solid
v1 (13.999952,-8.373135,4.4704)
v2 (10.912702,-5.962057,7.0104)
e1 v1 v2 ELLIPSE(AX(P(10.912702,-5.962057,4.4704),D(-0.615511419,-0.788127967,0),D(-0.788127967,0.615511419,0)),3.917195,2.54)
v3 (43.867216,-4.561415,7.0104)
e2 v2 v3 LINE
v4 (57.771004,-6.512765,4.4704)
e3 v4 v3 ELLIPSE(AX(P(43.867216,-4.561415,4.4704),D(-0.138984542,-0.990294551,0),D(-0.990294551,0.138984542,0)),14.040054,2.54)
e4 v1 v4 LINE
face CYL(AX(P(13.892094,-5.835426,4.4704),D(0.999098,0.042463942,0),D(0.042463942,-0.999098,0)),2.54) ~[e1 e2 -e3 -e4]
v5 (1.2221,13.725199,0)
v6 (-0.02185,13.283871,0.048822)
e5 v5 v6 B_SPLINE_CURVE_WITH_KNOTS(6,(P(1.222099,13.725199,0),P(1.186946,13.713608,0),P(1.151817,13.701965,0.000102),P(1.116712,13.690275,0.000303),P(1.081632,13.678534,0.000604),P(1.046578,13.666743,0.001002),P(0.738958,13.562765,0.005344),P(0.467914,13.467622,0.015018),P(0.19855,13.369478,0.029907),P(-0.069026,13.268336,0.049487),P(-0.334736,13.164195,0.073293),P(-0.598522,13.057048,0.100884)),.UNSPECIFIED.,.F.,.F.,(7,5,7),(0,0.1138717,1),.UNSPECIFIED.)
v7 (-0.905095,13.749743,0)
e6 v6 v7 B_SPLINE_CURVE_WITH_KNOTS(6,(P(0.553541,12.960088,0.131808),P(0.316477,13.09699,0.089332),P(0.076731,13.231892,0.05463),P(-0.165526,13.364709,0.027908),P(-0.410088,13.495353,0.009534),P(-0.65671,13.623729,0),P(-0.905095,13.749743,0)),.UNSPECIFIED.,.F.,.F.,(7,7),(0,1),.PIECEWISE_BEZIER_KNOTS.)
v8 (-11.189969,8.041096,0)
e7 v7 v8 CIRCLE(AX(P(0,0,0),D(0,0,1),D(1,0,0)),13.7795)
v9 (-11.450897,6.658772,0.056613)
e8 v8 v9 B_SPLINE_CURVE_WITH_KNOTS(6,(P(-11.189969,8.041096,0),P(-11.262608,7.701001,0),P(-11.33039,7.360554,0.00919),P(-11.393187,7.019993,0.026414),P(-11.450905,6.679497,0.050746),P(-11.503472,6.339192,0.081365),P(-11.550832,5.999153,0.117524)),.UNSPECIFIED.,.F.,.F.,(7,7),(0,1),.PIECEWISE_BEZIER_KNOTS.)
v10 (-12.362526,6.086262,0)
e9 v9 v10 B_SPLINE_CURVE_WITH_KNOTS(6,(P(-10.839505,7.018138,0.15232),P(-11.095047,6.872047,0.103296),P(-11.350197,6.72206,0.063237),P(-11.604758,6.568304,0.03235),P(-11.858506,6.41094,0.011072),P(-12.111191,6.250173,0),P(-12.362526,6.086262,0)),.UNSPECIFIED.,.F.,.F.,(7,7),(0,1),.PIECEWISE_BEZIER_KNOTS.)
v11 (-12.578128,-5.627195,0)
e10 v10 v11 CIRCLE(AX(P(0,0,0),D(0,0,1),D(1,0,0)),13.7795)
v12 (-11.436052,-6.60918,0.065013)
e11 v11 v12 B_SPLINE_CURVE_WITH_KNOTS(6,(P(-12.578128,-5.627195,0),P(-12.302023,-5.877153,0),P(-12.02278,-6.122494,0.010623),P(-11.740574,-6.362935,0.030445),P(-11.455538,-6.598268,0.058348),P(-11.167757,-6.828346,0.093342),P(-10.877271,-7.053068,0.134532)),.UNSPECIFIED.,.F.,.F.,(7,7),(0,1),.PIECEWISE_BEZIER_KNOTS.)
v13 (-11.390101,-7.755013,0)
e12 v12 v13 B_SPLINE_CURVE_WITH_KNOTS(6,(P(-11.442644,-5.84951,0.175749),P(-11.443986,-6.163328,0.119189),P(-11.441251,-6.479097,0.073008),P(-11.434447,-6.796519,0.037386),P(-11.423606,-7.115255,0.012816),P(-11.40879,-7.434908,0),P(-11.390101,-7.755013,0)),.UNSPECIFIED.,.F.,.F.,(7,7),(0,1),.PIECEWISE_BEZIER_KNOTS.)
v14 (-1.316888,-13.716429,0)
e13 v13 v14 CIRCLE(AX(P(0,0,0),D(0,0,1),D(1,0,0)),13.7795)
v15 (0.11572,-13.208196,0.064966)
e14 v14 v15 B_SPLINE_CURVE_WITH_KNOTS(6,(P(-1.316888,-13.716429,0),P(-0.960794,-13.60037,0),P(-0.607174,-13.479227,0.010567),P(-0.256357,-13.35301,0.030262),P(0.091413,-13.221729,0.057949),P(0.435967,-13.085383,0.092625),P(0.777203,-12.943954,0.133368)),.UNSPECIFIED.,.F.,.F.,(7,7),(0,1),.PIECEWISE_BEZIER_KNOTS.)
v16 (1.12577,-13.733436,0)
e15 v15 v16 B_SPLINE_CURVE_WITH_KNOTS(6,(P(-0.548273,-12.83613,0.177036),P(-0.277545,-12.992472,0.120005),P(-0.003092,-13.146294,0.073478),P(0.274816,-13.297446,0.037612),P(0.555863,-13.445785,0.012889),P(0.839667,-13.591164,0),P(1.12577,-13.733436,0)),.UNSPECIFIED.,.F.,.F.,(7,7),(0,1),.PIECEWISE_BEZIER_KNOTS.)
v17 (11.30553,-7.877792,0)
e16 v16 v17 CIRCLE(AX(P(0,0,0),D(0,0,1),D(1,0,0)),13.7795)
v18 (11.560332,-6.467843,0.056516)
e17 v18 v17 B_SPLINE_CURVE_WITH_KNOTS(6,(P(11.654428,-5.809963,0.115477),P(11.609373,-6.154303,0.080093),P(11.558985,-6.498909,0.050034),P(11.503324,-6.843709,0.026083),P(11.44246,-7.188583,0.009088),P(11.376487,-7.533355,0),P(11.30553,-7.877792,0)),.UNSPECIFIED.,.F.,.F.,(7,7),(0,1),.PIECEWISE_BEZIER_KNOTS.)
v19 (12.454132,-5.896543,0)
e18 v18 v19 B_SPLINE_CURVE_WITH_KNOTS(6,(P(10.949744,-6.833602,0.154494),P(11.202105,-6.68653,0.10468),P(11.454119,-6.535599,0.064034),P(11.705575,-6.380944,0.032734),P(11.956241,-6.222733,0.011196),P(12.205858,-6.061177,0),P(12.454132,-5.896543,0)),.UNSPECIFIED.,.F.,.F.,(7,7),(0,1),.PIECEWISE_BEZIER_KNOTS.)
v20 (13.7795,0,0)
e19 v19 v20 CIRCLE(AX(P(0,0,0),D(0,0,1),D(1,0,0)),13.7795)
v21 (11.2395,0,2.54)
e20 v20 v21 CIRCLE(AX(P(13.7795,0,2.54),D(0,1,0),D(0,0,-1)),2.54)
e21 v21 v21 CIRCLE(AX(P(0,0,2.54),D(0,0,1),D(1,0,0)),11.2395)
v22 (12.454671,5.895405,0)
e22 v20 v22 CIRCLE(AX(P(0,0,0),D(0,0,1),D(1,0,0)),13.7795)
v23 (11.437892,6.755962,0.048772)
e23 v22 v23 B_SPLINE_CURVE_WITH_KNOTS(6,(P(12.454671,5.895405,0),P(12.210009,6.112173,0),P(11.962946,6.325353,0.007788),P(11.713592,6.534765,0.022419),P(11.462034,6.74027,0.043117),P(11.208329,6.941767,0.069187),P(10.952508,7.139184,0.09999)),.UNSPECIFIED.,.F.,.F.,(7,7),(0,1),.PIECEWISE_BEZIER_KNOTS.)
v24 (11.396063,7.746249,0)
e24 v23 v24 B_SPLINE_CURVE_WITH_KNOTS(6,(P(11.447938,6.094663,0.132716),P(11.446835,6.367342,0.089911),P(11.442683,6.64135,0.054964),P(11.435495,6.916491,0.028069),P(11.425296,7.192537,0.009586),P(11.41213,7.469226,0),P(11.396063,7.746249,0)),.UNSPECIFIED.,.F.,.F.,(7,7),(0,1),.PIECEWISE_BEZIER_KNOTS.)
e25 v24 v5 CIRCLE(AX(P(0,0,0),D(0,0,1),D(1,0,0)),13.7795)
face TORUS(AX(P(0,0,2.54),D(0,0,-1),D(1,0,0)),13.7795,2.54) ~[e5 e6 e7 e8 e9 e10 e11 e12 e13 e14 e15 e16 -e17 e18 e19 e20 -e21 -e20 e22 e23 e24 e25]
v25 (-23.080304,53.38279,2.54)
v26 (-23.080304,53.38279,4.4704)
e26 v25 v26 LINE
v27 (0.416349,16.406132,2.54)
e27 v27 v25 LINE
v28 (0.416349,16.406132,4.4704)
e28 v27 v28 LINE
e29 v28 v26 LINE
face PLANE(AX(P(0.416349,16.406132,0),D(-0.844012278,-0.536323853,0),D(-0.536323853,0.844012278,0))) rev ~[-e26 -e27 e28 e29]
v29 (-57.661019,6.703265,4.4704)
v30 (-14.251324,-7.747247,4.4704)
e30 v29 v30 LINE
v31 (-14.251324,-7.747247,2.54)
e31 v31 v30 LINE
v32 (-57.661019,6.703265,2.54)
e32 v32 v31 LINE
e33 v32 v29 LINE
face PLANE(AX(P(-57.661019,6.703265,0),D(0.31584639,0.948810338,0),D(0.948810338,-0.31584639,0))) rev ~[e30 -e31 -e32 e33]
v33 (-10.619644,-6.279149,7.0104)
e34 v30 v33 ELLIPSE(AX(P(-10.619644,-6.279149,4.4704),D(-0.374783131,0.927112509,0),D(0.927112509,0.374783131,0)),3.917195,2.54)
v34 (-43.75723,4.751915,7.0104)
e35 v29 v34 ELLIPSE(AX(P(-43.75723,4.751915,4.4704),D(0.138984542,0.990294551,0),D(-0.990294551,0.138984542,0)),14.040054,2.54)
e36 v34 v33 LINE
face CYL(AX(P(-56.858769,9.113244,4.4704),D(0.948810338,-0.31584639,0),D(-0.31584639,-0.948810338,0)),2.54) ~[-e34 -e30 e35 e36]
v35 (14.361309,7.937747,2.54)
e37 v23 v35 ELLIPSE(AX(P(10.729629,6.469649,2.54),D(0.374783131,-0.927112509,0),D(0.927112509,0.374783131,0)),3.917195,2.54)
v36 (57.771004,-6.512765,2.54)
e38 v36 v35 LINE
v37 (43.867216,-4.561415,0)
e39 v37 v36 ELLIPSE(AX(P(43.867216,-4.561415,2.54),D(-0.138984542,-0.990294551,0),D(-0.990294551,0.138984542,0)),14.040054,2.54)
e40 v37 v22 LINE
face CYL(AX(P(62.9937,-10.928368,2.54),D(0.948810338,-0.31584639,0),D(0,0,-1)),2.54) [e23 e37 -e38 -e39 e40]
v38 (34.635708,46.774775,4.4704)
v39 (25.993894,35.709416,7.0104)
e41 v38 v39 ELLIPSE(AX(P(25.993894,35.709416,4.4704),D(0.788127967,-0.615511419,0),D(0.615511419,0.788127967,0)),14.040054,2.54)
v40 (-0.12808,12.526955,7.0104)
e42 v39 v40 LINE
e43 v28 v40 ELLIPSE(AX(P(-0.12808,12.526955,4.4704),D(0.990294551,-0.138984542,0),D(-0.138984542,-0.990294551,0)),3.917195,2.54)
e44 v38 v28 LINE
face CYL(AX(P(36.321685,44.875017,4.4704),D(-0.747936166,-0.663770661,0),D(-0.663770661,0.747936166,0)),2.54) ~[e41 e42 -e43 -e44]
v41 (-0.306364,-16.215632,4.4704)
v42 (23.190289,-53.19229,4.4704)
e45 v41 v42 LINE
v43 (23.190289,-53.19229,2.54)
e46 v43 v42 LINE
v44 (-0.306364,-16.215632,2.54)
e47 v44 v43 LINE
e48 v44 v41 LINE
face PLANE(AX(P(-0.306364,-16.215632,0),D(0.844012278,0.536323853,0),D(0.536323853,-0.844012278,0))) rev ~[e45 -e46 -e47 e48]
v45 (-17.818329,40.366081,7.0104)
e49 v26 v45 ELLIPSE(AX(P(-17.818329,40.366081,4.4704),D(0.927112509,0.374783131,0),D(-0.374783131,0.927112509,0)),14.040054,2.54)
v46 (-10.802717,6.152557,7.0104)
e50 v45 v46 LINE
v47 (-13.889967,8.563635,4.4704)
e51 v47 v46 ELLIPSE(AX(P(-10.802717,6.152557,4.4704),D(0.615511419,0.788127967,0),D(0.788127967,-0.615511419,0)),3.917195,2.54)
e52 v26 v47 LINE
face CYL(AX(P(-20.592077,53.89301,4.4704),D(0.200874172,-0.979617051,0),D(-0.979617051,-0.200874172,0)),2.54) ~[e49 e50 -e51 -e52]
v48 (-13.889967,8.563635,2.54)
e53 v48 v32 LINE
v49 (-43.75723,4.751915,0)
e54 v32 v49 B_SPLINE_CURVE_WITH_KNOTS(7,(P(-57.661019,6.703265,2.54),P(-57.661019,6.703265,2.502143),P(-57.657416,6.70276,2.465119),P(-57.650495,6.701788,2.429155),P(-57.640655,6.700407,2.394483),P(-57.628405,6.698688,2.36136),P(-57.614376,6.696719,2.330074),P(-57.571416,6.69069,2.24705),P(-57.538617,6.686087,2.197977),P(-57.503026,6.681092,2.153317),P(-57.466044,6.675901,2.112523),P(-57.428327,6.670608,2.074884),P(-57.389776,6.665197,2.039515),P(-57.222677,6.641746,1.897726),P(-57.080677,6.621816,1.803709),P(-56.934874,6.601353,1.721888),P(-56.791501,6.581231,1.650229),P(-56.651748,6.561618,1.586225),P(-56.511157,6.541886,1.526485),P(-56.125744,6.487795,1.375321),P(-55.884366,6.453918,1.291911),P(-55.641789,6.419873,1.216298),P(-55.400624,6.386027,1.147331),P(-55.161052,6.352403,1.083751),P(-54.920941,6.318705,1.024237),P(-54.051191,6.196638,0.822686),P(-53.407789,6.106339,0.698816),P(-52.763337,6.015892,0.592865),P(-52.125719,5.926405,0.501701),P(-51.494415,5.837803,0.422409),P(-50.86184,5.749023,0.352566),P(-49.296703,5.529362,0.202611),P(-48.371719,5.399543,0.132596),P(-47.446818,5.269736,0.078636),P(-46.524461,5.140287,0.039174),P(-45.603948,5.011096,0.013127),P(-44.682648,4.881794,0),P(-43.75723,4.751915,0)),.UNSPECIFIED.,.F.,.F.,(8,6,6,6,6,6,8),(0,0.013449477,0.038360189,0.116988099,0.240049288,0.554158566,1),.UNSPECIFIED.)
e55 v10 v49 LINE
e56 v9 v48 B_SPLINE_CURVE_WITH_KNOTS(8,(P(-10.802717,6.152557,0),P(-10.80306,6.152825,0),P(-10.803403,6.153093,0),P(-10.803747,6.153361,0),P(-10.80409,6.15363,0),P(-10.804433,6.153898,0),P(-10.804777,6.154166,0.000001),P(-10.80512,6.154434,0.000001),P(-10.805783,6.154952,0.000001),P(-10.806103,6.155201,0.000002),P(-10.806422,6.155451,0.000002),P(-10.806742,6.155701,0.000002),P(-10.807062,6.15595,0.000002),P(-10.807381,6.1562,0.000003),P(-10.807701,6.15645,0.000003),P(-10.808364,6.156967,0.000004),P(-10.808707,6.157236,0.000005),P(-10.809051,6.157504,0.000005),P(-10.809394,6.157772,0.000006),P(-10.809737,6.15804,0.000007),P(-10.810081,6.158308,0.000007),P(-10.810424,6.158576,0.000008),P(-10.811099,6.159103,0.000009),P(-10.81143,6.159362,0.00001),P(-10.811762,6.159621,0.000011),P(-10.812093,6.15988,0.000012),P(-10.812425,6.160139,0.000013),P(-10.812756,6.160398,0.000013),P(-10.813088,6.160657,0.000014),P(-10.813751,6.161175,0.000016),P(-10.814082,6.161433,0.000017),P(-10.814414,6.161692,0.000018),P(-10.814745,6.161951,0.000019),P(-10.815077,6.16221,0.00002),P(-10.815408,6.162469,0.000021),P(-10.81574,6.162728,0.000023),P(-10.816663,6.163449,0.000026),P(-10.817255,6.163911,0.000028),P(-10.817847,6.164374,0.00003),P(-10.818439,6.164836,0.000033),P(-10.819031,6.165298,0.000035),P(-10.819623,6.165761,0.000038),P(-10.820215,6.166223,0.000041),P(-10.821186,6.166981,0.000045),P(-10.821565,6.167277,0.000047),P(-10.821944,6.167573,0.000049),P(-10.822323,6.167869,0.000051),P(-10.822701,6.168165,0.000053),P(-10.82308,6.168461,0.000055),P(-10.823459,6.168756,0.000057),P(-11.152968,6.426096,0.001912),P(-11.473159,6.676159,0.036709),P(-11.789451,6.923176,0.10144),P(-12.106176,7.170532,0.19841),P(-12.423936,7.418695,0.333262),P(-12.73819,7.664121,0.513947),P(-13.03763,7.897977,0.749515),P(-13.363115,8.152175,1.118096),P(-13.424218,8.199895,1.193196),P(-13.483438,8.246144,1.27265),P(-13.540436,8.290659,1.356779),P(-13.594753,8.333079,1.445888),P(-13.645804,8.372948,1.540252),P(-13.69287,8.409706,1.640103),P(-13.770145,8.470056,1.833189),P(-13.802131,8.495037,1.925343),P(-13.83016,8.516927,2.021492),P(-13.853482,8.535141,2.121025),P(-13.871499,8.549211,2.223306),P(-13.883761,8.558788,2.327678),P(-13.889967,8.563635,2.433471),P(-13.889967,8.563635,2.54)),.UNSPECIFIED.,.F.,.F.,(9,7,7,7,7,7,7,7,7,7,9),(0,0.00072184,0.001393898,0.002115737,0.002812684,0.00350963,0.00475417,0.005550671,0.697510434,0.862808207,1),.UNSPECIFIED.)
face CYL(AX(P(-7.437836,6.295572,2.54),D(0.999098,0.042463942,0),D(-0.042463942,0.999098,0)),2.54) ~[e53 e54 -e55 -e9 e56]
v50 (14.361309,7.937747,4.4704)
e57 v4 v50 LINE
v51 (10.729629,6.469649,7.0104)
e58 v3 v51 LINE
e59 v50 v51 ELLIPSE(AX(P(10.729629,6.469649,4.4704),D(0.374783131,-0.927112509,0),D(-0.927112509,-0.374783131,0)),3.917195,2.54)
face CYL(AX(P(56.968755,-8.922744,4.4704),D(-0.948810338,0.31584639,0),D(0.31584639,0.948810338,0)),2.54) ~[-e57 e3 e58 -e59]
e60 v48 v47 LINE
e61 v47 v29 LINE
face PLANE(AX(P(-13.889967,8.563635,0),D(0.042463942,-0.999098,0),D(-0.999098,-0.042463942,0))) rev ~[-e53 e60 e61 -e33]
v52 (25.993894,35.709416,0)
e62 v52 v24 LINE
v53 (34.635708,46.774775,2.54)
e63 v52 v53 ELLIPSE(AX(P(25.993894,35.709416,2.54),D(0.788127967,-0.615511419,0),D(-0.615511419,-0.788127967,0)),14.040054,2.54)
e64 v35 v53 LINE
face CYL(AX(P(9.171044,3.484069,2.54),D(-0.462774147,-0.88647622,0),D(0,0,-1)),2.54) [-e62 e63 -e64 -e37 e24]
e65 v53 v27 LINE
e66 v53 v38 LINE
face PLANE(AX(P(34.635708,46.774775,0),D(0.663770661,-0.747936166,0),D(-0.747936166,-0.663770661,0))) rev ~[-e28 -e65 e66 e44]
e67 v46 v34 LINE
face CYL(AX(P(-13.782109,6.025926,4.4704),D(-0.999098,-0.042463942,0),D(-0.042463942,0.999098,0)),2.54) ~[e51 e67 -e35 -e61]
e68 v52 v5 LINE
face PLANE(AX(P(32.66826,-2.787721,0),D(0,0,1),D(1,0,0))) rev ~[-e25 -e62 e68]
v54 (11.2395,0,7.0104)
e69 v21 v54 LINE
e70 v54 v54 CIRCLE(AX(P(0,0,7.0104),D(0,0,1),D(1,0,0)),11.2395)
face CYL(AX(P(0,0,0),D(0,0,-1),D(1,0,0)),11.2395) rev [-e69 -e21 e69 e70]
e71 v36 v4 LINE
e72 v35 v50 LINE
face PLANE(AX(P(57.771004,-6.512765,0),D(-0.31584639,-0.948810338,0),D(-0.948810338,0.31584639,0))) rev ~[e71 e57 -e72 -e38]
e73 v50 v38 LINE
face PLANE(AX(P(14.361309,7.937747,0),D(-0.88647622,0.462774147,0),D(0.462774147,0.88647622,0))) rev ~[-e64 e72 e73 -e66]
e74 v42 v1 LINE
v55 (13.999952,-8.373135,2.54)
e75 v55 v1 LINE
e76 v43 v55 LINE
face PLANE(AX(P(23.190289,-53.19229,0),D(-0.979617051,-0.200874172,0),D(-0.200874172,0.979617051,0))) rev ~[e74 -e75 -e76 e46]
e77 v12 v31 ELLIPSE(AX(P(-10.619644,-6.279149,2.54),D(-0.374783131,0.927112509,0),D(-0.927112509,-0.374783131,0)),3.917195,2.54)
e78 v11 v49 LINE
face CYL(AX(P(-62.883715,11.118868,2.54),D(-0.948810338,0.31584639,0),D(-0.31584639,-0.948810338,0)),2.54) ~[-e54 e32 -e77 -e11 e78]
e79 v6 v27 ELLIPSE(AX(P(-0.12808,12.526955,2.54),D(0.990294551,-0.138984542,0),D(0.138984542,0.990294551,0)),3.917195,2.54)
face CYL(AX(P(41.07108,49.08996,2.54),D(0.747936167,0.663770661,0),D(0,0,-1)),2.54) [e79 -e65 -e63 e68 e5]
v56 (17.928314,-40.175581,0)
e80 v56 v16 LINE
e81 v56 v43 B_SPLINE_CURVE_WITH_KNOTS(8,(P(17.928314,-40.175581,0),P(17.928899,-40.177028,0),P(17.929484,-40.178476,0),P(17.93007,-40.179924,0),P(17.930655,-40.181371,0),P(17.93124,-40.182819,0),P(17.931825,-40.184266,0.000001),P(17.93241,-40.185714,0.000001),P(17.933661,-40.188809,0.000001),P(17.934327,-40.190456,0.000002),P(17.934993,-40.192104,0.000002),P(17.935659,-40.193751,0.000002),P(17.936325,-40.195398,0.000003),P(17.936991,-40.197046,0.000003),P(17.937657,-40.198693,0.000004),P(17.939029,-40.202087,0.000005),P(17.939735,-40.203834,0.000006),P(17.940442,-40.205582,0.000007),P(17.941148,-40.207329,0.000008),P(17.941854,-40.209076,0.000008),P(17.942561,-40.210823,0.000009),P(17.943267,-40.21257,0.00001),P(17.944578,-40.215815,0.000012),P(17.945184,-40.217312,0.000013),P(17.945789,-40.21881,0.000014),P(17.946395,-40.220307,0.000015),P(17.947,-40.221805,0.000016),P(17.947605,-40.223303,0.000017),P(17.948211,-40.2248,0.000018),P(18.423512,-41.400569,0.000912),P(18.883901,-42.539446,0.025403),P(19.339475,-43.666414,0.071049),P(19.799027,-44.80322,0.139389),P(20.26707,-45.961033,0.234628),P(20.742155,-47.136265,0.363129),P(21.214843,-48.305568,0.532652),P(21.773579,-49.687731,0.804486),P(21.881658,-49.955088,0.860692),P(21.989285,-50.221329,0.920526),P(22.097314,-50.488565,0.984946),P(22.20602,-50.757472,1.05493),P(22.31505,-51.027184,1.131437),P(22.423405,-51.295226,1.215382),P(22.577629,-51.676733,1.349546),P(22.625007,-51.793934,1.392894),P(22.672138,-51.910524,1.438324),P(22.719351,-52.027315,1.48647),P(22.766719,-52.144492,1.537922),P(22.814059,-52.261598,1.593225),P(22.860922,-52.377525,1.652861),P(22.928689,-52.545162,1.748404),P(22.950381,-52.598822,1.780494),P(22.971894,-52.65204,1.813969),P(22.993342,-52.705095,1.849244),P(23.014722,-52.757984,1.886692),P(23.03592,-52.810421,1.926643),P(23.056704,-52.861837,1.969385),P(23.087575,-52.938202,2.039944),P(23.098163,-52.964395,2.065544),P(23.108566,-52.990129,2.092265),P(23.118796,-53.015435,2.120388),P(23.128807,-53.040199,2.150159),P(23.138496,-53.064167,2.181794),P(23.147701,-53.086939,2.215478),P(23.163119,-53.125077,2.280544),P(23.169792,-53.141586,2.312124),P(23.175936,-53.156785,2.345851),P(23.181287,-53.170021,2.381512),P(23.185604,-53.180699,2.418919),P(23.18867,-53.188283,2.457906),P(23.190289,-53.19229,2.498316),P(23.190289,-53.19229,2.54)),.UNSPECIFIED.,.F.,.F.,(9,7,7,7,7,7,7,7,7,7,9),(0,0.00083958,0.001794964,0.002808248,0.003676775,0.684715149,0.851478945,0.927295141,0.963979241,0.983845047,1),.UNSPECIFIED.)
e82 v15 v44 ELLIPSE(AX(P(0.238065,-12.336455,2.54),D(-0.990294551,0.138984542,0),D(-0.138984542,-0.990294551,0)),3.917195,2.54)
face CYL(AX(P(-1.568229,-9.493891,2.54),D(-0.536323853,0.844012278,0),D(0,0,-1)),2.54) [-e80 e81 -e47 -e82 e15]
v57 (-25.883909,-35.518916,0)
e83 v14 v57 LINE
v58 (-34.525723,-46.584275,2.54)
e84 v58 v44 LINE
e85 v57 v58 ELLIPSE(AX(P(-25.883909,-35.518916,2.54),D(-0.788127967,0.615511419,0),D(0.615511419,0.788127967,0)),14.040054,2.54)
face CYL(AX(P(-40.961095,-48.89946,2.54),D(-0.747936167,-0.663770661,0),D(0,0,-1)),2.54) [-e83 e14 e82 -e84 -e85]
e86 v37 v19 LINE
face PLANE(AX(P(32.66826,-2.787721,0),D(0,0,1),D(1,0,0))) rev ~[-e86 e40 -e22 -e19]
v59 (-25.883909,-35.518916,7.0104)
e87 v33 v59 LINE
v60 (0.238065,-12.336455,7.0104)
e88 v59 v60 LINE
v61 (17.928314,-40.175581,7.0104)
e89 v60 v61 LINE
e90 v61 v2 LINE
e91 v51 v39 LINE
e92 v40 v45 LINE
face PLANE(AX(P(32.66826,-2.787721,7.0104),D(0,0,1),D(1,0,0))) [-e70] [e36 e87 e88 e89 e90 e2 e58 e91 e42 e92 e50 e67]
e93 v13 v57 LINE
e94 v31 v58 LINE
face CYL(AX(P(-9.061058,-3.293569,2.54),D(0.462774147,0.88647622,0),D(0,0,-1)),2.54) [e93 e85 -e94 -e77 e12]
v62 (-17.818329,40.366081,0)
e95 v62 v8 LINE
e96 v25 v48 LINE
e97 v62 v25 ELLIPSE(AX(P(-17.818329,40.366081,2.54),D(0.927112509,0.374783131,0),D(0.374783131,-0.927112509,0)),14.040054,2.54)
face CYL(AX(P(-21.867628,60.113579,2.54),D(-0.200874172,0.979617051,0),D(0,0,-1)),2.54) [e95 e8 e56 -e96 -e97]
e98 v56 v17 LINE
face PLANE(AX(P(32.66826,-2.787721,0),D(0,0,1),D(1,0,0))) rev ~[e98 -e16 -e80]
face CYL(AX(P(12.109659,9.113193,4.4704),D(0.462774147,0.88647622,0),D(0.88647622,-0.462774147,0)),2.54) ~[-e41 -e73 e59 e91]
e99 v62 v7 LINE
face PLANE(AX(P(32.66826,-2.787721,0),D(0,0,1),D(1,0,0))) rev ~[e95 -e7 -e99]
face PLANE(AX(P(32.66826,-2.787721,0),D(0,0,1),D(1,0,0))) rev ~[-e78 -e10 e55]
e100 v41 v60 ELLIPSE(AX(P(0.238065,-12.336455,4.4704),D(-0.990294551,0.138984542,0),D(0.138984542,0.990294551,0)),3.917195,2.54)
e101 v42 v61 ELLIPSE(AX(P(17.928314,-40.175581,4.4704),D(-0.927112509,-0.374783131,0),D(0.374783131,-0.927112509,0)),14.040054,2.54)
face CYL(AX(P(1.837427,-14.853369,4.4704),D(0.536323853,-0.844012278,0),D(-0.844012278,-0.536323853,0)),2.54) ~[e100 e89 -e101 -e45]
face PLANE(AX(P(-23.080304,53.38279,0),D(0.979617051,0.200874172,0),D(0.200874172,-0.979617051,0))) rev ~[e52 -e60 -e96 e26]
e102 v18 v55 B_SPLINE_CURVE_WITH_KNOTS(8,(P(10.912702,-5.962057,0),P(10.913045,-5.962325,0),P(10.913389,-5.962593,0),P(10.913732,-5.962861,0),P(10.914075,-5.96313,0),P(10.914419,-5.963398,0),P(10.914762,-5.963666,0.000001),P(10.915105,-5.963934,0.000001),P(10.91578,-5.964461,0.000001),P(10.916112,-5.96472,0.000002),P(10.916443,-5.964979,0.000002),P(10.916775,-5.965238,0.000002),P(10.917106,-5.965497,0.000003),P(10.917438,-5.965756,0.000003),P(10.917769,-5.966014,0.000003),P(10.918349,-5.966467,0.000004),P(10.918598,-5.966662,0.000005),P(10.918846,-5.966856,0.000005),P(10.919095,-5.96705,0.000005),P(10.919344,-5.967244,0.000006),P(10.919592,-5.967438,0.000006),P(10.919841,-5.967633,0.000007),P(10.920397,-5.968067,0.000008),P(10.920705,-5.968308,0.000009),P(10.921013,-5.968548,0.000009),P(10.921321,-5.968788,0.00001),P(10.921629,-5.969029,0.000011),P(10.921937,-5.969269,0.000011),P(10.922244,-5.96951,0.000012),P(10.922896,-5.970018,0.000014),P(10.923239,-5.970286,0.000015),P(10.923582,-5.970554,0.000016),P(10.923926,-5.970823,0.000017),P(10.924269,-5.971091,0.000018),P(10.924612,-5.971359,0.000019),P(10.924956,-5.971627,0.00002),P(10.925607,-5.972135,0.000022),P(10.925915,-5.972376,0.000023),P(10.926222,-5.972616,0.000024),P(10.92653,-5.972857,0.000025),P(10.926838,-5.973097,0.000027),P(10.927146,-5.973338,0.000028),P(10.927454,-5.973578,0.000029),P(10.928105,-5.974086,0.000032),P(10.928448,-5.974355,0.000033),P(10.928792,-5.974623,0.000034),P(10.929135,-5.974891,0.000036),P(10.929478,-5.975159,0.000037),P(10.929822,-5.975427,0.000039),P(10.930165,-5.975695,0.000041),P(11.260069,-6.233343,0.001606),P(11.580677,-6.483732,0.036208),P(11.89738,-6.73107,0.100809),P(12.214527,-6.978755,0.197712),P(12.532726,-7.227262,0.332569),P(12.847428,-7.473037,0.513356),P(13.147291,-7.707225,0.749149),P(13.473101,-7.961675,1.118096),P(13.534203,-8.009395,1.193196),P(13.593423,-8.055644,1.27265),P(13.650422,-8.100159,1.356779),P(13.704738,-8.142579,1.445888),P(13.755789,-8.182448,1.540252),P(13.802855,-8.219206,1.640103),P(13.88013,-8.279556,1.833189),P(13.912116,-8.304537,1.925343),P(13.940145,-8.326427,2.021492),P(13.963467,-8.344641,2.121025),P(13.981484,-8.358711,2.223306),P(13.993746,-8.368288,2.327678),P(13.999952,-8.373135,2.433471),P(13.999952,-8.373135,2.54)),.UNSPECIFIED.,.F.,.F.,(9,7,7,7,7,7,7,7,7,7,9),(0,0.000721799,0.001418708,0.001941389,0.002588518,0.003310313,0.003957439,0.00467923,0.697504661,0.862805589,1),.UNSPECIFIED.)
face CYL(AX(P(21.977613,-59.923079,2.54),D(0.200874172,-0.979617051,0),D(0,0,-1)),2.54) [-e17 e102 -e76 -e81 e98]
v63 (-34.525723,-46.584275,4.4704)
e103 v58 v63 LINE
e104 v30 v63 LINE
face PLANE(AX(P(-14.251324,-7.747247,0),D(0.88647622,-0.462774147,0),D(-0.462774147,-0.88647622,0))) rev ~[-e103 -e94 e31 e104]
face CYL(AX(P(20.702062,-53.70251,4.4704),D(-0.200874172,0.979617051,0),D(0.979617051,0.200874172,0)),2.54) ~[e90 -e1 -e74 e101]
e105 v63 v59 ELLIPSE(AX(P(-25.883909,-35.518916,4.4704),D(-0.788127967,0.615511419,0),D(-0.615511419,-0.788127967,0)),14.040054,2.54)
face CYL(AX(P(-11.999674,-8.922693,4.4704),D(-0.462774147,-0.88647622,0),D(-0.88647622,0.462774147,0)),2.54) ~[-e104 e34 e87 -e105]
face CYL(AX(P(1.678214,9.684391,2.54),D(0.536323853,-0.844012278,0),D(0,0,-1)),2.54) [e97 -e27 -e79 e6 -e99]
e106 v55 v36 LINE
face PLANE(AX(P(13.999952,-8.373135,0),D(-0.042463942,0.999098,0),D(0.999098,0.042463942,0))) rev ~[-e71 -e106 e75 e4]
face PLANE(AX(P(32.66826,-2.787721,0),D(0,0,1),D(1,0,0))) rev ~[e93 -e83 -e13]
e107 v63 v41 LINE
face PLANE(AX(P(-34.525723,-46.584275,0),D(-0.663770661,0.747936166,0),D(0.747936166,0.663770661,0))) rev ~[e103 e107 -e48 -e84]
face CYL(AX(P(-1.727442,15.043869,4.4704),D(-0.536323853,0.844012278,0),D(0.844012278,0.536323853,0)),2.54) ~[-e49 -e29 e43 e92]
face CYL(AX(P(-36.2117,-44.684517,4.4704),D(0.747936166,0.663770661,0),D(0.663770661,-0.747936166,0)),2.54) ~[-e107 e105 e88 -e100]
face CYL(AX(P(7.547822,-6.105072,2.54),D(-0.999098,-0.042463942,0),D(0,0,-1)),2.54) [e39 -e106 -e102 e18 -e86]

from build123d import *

# Parameters (mm, degrees)
F0_R          = 11.2395
F1_DEPTH      = 7.0104
F2_R          = 2.54
F3_T4_DEPTH   = 58.4517099093
F3_T9_DEPTH   = 56.5105690907
F3_T14_DEPTH  = 58.4517099093
F3_T19_DEPTH  = 56.5105690907
F3_T24_DEPTH  = 58.4517099093
F3_T29_DEPTH  = 56.5105690907
F3_T34_DEPTH  = 58.4517099093
F3_T39_DEPTH  = 56.5105690907
F3_T44_DEPTH  = 58.4517099093
F3_T49_DEPTH  = 56.5105690907
F3_T54_DEPTH  = 58.4517099093
F3_T59_DEPTH  = 56.5105690907
F3_T67_DEPTH  = 58.4517099093
F3_T71_DEPTH  = 56.5105690907
F3_T78_DEPTH  = 58.4517099093
F3_T82_DEPTH  = 56.5105690907
F3_T89_DEPTH  = 58.4517099093
F3_T93_DEPTH  = 56.5105690907
F3_T100_DEPTH = 58.4517099093
F3_T104_DEPTH = 56.5105690907
F3_T111_DEPTH = 58.4517099093
F3_T115_DEPTH = 56.5105690907
F3_T122_DEPTH = 56.5105690907
F3_T126_DEPTH = 58.4517099093


# Not quite as in the source:
# - a fillet or chamfer that OpenCascade refuses, or shapes differently, is made with other operations: its cross-section is extruded or revolved along the edge and cut away or added


with BuildPart() as f1:
    # F0 (on Top) → F1 (new body)
    with BuildSketch(Plane.XY):
        with BuildLine():
            ThreePointArc((14.1535943712, 7.539855096), (15.5587542777, 3.8857192152), (16.036634575, 0))
            ThreePointArc((16.036634575, 0), (15.49765005, -4.122680126), (13.91692656, -7.9682371712))
            Line((13.91692656, -7.9682371712), (13.9999523741, -8.373134936))
            Line((13.9999523741, -8.373134936), (57.7710043319, -6.5127654675))
            Line((57.7710043319, -6.5127654675), (14.3613089772, 7.9377469398))
            Line((14.3613089772, 7.9377469398), (14.1535943712, 7.539855096))
        make_face()
        with BuildLine():
            ThreePointArc((0, 16.036634575), (8.2540822497, 13.7493190635), (14.1535943712, 7.539855096))
            Line((14.1535943712, 7.539855096), (14.3613089772, 7.9377469398))
            Line((14.3613089772, 7.9377469398), (34.635707736, 46.7747746198))
            Line((34.635707736, 46.7747746198), (0.4163492162, 16.4061318757))
            Line((0.4163492162, 16.4061318757), (0, 16.036634575))
        make_face()
        with BuildLine():
            Line((13.9999523741, -8.373134936), (13.91692656, -7.9682371712))
            ThreePointArc((13.91692656, -7.9682371712), (13.7943089537, -8.1786728131), (13.6685096291, -8.387222008))
            Line((13.6685096291, -8.387222008), (13.9999523741, -8.373134936))
        make_face()
        with BuildLine():
            ThreePointArc((-13.549530457, 8.5781042712), (-7.7333603611, 14.048800163), (0, 16.036634575))
            Line((0, 16.036634575), (0.4163492162, 16.4061318757))
            Line((0.4163492162, 16.4061318757), (-23.0803039828, 53.3827900874))
            Line((-23.0803039828, 53.3827900874), (-13.8899671478, 8.563634936))
            Line((-13.8899671478, 8.563634936), (-13.549530457, 8.5781042712))
        make_face()
        with BuildLine():
            Line((13.9999523741, -8.373134936), (13.6685096291, -8.387222008))
            ThreePointArc((13.6685096291, -8.387222008), (7.7861485351, -14.0196126723), (-0.1042878985, -16.036295474))
            Line((-0.1042878985, -16.036295474), (-0.30636399, -16.2156318757))
            Line((-0.30636399, -16.2156318757), (23.190289209, -53.1922900874))
            Line((23.190289209, -53.1922900874), (13.9999523741, -8.373134936))
        make_face()
        with BuildLine():
            ThreePointArc((-13.8067270062, 8.157691945), (-13.6797438656, 8.3688862021), (-13.549530457, 8.5781042712))
            Line((-13.549530457, 8.5781042712), (-13.8899671478, 8.563634936))
            Line((-13.8899671478, 8.563634936), (-13.8067270062, 8.157691945))
        make_face()
        with BuildLine():
            Line((-0.30636399, -16.2156318757), (-0.1042878985, -16.036295474))
            ThreePointArc((-0.1042878985, -16.036295474), (-0.2639889319, -16.0344615855), (-0.4236637816, -16.0310373181))
            Line((-0.4236637816, -16.0310373181), (-0.30636399, -16.2156318757))
        make_face()
        with BuildLine():
            ThreePointArc((-14.1482702845, -7.5498408229), (-16.0328448753, 0.3486168375), (-13.8067270062, 8.157691945))
            Line((-13.8067270062, 8.157691945), (-13.8899671478, 8.563634936))
            Line((-13.8899671478, 8.563634936), (-57.6610191056, 6.7032654675))
            Line((-57.6610191056, 6.7032654675), (-14.2513237509, -7.7472469398))
            Line((-14.2513237509, -7.7472469398), (-14.1482702845, -7.5498408229))
        make_face()
        with BuildLine():
            Line((-0.30636399, -16.2156318757), (-0.4236637816, -16.0310373181))
            ThreePointArc((-0.4236637816, -16.0310373181), (-8.2924525996, -13.7262113628), (-13.9934373276, -7.8330939131))
            Line((-13.9934373276, -7.8330939131), (-14.2513237509, -7.7472469398))
            Line((-14.2513237509, -7.7472469398), (-34.5257225097, -46.5842746198))
            Line((-34.5257225097, -46.5842746198), (-0.30636399, -16.2156318757))
        make_face()
        with BuildLine():
            ThreePointArc((-13.9934373276, -7.8330939131), (-14.0715665407, -7.6918569659), (-14.1482702845, -7.5498408229))
            Line((-14.1482702845, -7.5498408229), (-14.2513237509, -7.7472469398))
            Line((-14.2513237509, -7.7472469398), (-13.9934373276, -7.8330939131))
        make_face()
        with BuildLine():
            ThreePointArc((13.91692656, -7.9682371712), (15.49765005, -4.122680126), (16.036634575, 0))
            ThreePointArc((16.036634575, 0), (15.5587542777, 3.8857192152), (14.1535943712, 7.539855096))
            ThreePointArc((14.1535943712, 7.539855096), (8.2540822497, 13.7493190635), (0, 16.036634575))
            ThreePointArc((0, 16.036634575), (-7.7333603611, 14.048800163), (-13.549530457, 8.5781042712))
            ThreePointArc((-13.549530457, 8.5781042712), (-13.6797438656, 8.3688862021), (-13.8067270062, 8.157691945))
            ThreePointArc((-13.8067270062, 8.157691945), (-16.0328448753, 0.3486168375), (-14.1482702845, -7.5498408229))
            ThreePointArc((-14.1482702845, -7.5498408229), (-14.0715665407, -7.6918569659), (-13.9934373276, -7.8330939131))
            ThreePointArc((-13.9934373276, -7.8330939131), (-8.2924525996, -13.7262113628), (-0.4236637816, -16.0310373181))
            ThreePointArc((-0.4236637816, -16.0310373181), (-0.2639889319, -16.0344615855), (-0.1042878985, -16.036295474))
            ThreePointArc((-0.1042878985, -16.036295474), (7.7861485351, -14.0196126723), (13.6685096291, -8.387222008))
            ThreePointArc((13.6685096291, -8.387222008), (13.7943089537, -8.1786728131), (13.91692656, -7.9682371712))
        make_face()
        Circle(F0_R, mode=Mode.SUBTRACT)
    extrude(amount=F1_DEPTH)

    # F2
    f2_edges = [f1.edges().sort_by_distance(p)[0] for p in [
        (36.066157, 0.712491, 7.0104),
        (24.498508, 27.356261, 7.0104),
        (17.526028, 31.590453, 7.0104),
        (-11.331977, 34.894461, 7.0104),
        (-18.485136, 30.973213, 7.0104),
        (-35.775493, 7.63345, 7.0104),
        (-35.956171, -0.521991, 7.0104),
        (-24.388523, -27.165761, 7.0104),
        (-17.416043, -31.399953, 7.0104),
        (11.441963, -34.703961, 7.0104),
        (18.595121, -30.782713, 7.0104),
        (35.885478, -7.44295, 7.0104),
    ]]
    fillet(f2_edges, radius=F2_R)

    # F3: fillet of radius 2.54 on 13 edges, made by hand


with BuildPart() as f3_tool2:
    # F3_s3 → F3_t4 (new body)
    with BuildSketch(Plane(origin=(-59.9425858258, 19.9540925852, 0), x_dir=(0, 0, 1), z_dir=(0.9488103383, -0.3158463899, 0))):
        with BuildLine():
            ThreePointArc((2.54, 11.8518971477), (0.7439487758, 11.1079483719), (0, 9.3118971477))
            Line((0, 9.3118971477), (0, 11.8518971477))
            Line((0, 11.8518971477), (2.54, 11.8518971477))
        make_face()
    extrude(amount=F3_T4_DEPTH)

    split(bisect_by=Plane(origin=(-8.0210442823, 4.1872887797, 0), x_dir=(0, 0, 1), z_dir=(-0.8864762199, 0.4627741474, 0)), keep=Keep.TOP)


with BuildPart() as f1_1:
    add(f1.part)

    # F3_t1: cut F3_tool2
    add(f3_tool2.part, mode=Mode.SUBTRACT)


with BuildPart() as f3_tool7:
    # F3_s8 → F3_t9 (new body)
    with BuildSketch(Plane(origin=(-3.2916636325, -6.305411723, 0), x_dir=(0, 0, 1), z_dir=(-0.4627741474, -0.8864762199, 0))):
        with BuildLine():
            ThreePointArc((0, 6.5082340102), (0.7439487758, 8.3042852344), (2.54, 9.0482340102))
            Line((2.54, 9.0482340102), (0, 9.0482340102))
            Line((0, 9.0482340102), (0, 6.5082340102))
        make_face()
    extrude(amount=F3_T9_DEPTH)

    split(bisect_by=Plane(origin=(-3.7433789278, -11.2452025417, 0), x_dir=(0, 0, 1), z_dir=(-0.3158463899, -0.9488103383, 0)), keep=Keep.TOP)


with BuildPart() as f1_2:
    add(f1_1.part)

    # F3_t6: cut F3_tool7
    add(f3_tool7.part, mode=Mode.SUBTRACT)


with BuildPart() as f3_tool12:
    # F3_s13 → F3_t14 (new body)
    with BuildSketch(Plane(origin=(-47.1905173297, -41.8801527464, 0), x_dir=(0, 0, 1), z_dir=(0.7479361665, 0.6637706613, 0))):
        with BuildLine():
            ThreePointArc((0, 9.3849021141), (0.7439487758, 11.1809533383), (2.54, 11.9249021141))
            Line((2.54, 11.9249021141), (0, 11.9249021141))
            Line((0, 11.9249021141), (0, 9.3849021141))
        make_face()
    extrude(amount=F3_T14_DEPTH)

    split(bisect_by=Plane(origin=(-7.5584718817, -4.8029973802, 0), x_dir=(0, 0, 1), z_dir=(-0.8440122778, -0.5363238526, 0)), keep=Keep.TOP)


with BuildPart() as f1_3:
    add(f1_2.part)

    # F3_t11: cut F3_tool12
    add(f3_tool12.part, mode=Mode.SUBTRACT)


with BuildPart() as f3_tool17:
    # F3_s18 → F3_t19 (new body)
    with BuildSketch(Plane(origin=(3.8464514278, -6.0531565313, 0), x_dir=(0, 0, 1), z_dir=(0.5363238526, -0.8440122778, 0))):
        with BuildLine():
            ThreePointArc((0, 6.4154051288), (0.7439487758, 8.211456353), (2.54, 8.9554051288))
            Line((2.54, 8.9554051288), (0, 8.9554051288))
            Line((0, 8.9554051288), (0, 6.4154051288))
        make_face()
    extrude(amount=F3_T19_DEPTH)

    split(bisect_by=Plane(origin=(7.9154001627, -8.9190655729, 0), x_dir=(0, 0, 1), z_dir=(0.6637706613, -0.7479361665, 0)), keep=Keep.TOP)


with BuildPart() as f1_4:
    add(f1_3.part)

    # F3_t16: cut F3_tool17
    add(f3_tool17.part, mode=Mode.SUBTRACT)


with BuildPart() as f3_tool22:
    # F3_s23 → F3_t24 (new body)
    with BuildSketch(Plane(origin=(12.6784554794, -61.8299060653, 0), x_dir=(0, 0, 1), z_dir=(-0.2008741718, 0.9796170513, 0))):
        with BuildLine():
            ThreePointArc((0, 9.4926455171), (0.7439487758, 11.2886967414), (2.54, 12.0326455171))
            Line((2.54, 12.0326455171), (0, 12.0326455171))
            Line((0, 12.0326455171), (0, 9.4926455171))
        make_face()
    extrude(amount=F3_T24_DEPTH)

    split(bisect_by=Plane(origin=(0.3804801286, -8.9519935471, 0), x_dir=(0, 0, 1), z_dir=(0.0424639421, -0.999098, 0)), keep=Keep.TOP)


with BuildPart() as f1_5:
    add(f1_4.part)

    # F3_t21: cut F3_tool22
    add(f3_tool22.part, mode=Mode.SUBTRACT)


with BuildPart() as f3_tool27:
    # F3_s28 → F3_t29 (new body)
    with BuildSketch(Plane(origin=(7.2751999455, 0.3092125789, 0), x_dir=(0, 0, 1), z_dir=(0.999098, 0.0424639421, 0))):
        with BuildLine():
            ThreePointArc((0, 6.4200755351), (0.7439487758, 8.2161267593), (2.54, 8.9600755351))
            Line((2.54, 8.9600755351), (0, 8.9600755351))
            Line((0, 8.9600755351), (0, 6.4200755351))
        make_face()
    extrude(amount=F3_T29_DEPTH)

    split(bisect_by=Plane(origin=(11.7873847203, 2.4170477024, 0), x_dir=(0, 0, 1), z_dir=(0.9796170513, 0.2008741718, 0)), keep=Keep.TOP)


with BuildPart() as f1_6:
    add(f1_5.part)

    # F3_t26: cut F3_tool27
    add(f3_tool27.part, mode=Mode.SUBTRACT)


with BuildPart() as f3_tool32:
    # F3_s33 → F3_t34 (new body)
    with BuildSketch(Plane(origin=(59.9845103223, -19.9680486945, 0), x_dir=(0, 0, 1), z_dir=(-0.9488103383, 0.3158463899, 0))):
        with BuildLine():
            ThreePointArc((0, 9.5273839538), (0.7439487758, 11.323435178), (2.54, 12.0673839538))
            Line((2.54, 12.0673839538), (0, 12.0673839538))
            Line((0, 12.0673839538), (0, 9.5273839538))
        make_face()
    extrude(amount=F3_T34_DEPTH)

    split(bisect_by=Plane(origin=(8.0293246905, -4.1916114663, 0), x_dir=(0, 0, 1), z_dir=(0.8864762199, -0.4627741474, 0)), keep=Keep.TOP)


with BuildPart() as f1_7:
    add(f1_6.part)

    # F3_t31: cut F3_tool32
    add(f3_tool32.part, mode=Mode.SUBTRACT)


with BuildPart() as f3_tool37:
    # F3_s38 → F3_t39 (new body)
    with BuildSketch(Plane(origin=(3.3933684506, 6.5002344095, 0), x_dir=(0, 0, 1), z_dir=(0.4627741474, 0.8864762199, 0))):
        with BuildLine():
            ThreePointArc((0, 6.5175748228), (0.7439487758, 8.313626047), (2.54, 9.0575748228))
            Line((2.54, 9.0575748228), (0, 9.0575748228))
            Line((0, 9.0575748228), (0, 6.5175748228))
        make_face()
    extrude(amount=F3_T39_DEPTH)

    split(bisect_by=Plane(origin=(3.8114396575, 11.449658651, 0), x_dir=(0, 0, 1), z_dir=(0.3158463899, 0.9488103383, 0)), keep=Keep.TOP)


with BuildPart() as f1_8:
    add(f1_7.part)

    # F3_t36: cut F3_tool37
    add(f3_tool37.part, mode=Mode.SUBTRACT)


with BuildPart() as f3_tool42:
    # F3_s43 → F3_t44 (new body)
    with BuildSketch(Plane(origin=(47.3466192661, 42.0186884801, 0), x_dir=(0, 0, 1), z_dir=(-0.7479361665, -0.6637706613, 0))):
        with BuildLine():
            ThreePointArc((0, 9.4543789874), (0.7439487758, 11.2504302116), (2.54, 11.9943789874))
            Line((2.54, 11.9943789874), (0, 11.9943789874))
            Line((0, 11.9943789874), (0, 9.4543789874))
        make_face()
    extrude(amount=F3_T44_DEPTH)

    split(bisect_by=Plane(origin=(7.7230530734, 4.9075797674, 0), x_dir=(0, 0, 1), z_dir=(0.8440122778, 0.5363238526, 0)), keep=Keep.TOP)


with BuildPart() as f1_9:
    add(f1_8.part)

    # F3_t41: cut F3_tool42
    add(f3_tool42.part, mode=Mode.SUBTRACT)


with BuildPart() as f3_tool47:
    # F3_s48 → F3_t49 (new body)
    with BuildSketch(Plane(origin=(-3.9010473932, 6.1390741441, 0), x_dir=(0, 0, 1), z_dir=(-0.5363238526, 0.8440122778, 0))):
        with BuildLine():
            ThreePointArc((0, 6.6104037041), (0.7439487758, 8.4064549283), (2.54, 9.1504037041))
            Line((2.54, 9.1504037041), (0, 9.1504037041))
            Line((0, 9.1504037041), (0, 6.6104037041))
        make_face()
    extrude(amount=F3_T49_DEPTH)

    split(bisect_by=Plane(origin=(-7.9615168729, 8.9710298392, 0), x_dir=(0, 0, 1), z_dir=(-0.6637706613, 0.7479361665, 0)), keep=Keep.TOP)


with BuildPart() as f1_10:
    add(f1_9.part)

    # F3_t46: cut F3_tool47
    add(f3_tool47.part, mode=Mode.SUBTRACT)


with BuildPart() as f3_tool52:
    # F3_s53 → F3_t54 (new body)
    with BuildSketch(Plane(origin=(-12.7115040729, 61.9910764409, 0), x_dir=(0, 0, 1), z_dir=(0.2008741718, -0.9796170513, 0))):
        with BuildLine():
            ThreePointArc((0, 9.3466355844), (0.7439487758, 11.1426868086), (2.54, 11.8866355844))
            Line((2.54, 11.8866355844), (0, 11.8866355844))
            Line((0, 11.8866355844), (0, 9.3466355844))
        make_face()
    extrude(amount=F3_T54_DEPTH)

    split(bisect_by=Plane(origin=(-0.3883638891, 9.1374838465, 0), x_dir=(0, 0, 1), z_dir=(-0.0424639421, 0.999098, 0)), keep=Keep.TOP)


with BuildPart() as f1_11:
    add(f1_10.part)

    # F3_t51: cut F3_tool52
    add(f3_tool52.part, mode=Mode.SUBTRACT)


with BuildPart() as f3_tool57:
    # F3_s58 → F3_t59 (new body)
    with BuildSketch(Plane(origin=(-7.1573309587, -0.3042028783, 0), x_dir=(0, 0, 1), z_dir=(-0.999098, -0.0424639421, 0))):
        with BuildLine():
            ThreePointArc((2.54, 9.1457332978), (0.7439487758, 8.4017845221), (0, 6.6057332978))
            Line((0, 6.6057332978), (0, 9.1457332978))
            Line((0, 9.1457332978), (2.54, 9.1457332978))
        make_face()
    extrude(amount=F3_T59_DEPTH)

    split(bisect_by=Plane(origin=(-11.6443509005, -2.3877180781, 0), x_dir=(0, 0, 1), z_dir=(-0.9796170513, -0.2008741718, 0)), keep=Keep.TOP)


with BuildPart() as f1_12:
    add(f1_11.part)

    # F3_t56: cut F3_tool57
    add(f3_tool57.part, mode=Mode.SUBTRACT)

    # F3_s61 → F3_t62 (revolve, cut)
    with BuildSketch(Plane.XZ):
        with BuildLine():
            ThreePointArc((13.7795, 0), (11.9834487758, 0.7439487758), (11.2395, 2.54))
            Line((11.2395, 2.54), (11.2395, 0))
            Line((11.2395, 0), (13.7795, 0))
        make_face()
    revolve(axis=Axis((0, 0, 0), (0, 0, 1)), mode=Mode.SUBTRACT)


with BuildPart() as f3_tool65:
    # F3_s66 → F3_t67 (new body)
    with BuildSketch(Plane(origin=(-59.9425858258, 19.9540925852, 0), x_dir=(0, 0, 1), z_dir=(0.9488103383, -0.3158463899, 0))):
        with BuildLine():
            ThreePointArc((2.54, 11.8518971477), (0.7439487758, 11.1079483719), (0, 9.3118971477))
            Line((0, 9.3118971477), (0, 11.8518971477))
            Line((0, 11.8518971477), (2.54, 11.8518971477))
        make_face()
    extrude(amount=F3_T67_DEPTH)

    split(bisect_by=Plane(origin=(-8.0210442823, 4.1872887797, 0), x_dir=(0, 0, 1), z_dir=(0.8864762199, -0.4627741474, 0)), keep=Keep.TOP)


with BuildPart() as f3_tool69:
    # F3_s70 → F3_t71 (new body)
    with BuildSketch(Plane(origin=(-3.2916636325, -6.305411723, 0), x_dir=(0, 0, 1), z_dir=(-0.4627741474, -0.8864762199, 0))):
        with BuildLine():
            ThreePointArc((0, 6.5082340102), (0.7439487758, 8.3042852344), (2.54, 9.0482340102))
            Line((2.54, 9.0482340102), (0, 9.0482340102))
            Line((0, 9.0482340102), (0, 6.5082340102))
        make_face()
    extrude(amount=F3_T71_DEPTH)

    split(bisect_by=Plane(origin=(-3.7433789278, -11.2452025417, 0), x_dir=(0, 0, 1), z_dir=(0.3158463899, 0.9488103383, 0)), keep=Keep.TOP)


with BuildPart() as f3_tool65_1:
    add(f3_tool65.part)

    # F3_t73: intersect F3_tool69
    add(f3_tool69.part, mode=Mode.INTERSECT)


with BuildPart() as f1_13:
    add(f1_12.part)

    # F3_t63: cut F3_tool65
    add(f3_tool65_1.part, mode=Mode.SUBTRACT)


with BuildPart() as f3_tool76:
    # F3_s77 → F3_t78 (new body)
    with BuildSketch(Plane(origin=(-47.1905173297, -41.8801527464, 0), x_dir=(0, 0, 1), z_dir=(0.7479361665, 0.6637706613, 0))):
        with BuildLine():
            ThreePointArc((0, 9.3849021141), (0.7439487758, 11.1809533383), (2.54, 11.9249021141))
            Line((2.54, 11.9249021141), (0, 11.9249021141))
            Line((0, 11.9249021141), (0, 9.3849021141))
        make_face()
    extrude(amount=F3_T78_DEPTH)

    split(bisect_by=Plane(origin=(-7.5584718817, -4.8029973802, 0), x_dir=(0, 0, 1), z_dir=(0.8440122778, 0.5363238526, 0)), keep=Keep.TOP)


with BuildPart() as f3_tool80:
    # F3_s81 → F3_t82 (new body)
    with BuildSketch(Plane(origin=(3.8464514278, -6.0531565313, 0), x_dir=(0, 0, 1), z_dir=(0.5363238526, -0.8440122778, 0))):
        with BuildLine():
            ThreePointArc((0, 6.4154051288), (0.7439487758, 8.211456353), (2.54, 8.9554051288))
            Line((2.54, 8.9554051288), (0, 8.9554051288))
            Line((0, 8.9554051288), (0, 6.4154051288))
        make_face()
    extrude(amount=F3_T82_DEPTH)

    split(bisect_by=Plane(origin=(7.9154001627, -8.9190655729, 0), x_dir=(0, 0, 1), z_dir=(-0.6637706613, 0.7479361665, 0)), keep=Keep.TOP)


with BuildPart() as f3_tool76_1:
    add(f3_tool76.part)

    # F3_t84: intersect F3_tool80
    add(f3_tool80.part, mode=Mode.INTERSECT)


with BuildPart() as f1_14:
    add(f1_13.part)

    # F3_t74: cut F3_tool76
    add(f3_tool76_1.part, mode=Mode.SUBTRACT)


with BuildPart() as f3_tool87:
    # F3_s88 → F3_t89 (new body)
    with BuildSketch(Plane(origin=(12.6784554794, -61.8299060653, 0), x_dir=(0, 0, 1), z_dir=(-0.2008741718, 0.9796170513, 0))):
        with BuildLine():
            ThreePointArc((0, 9.4926455171), (0.7439487758, 11.2886967414), (2.54, 12.0326455171))
            Line((2.54, 12.0326455171), (0, 12.0326455171))
            Line((0, 12.0326455171), (0, 9.4926455171))
        make_face()
    extrude(amount=F3_T89_DEPTH)

    split(bisect_by=Plane(origin=(0.3804801286, -8.9519935471, 0), x_dir=(0, 0, 1), z_dir=(-0.0424639421, 0.999098, 0)), keep=Keep.TOP)


with BuildPart() as f3_tool91:
    # F3_s92 → F3_t93 (new body)
    with BuildSketch(Plane(origin=(7.2751999455, 0.3092125789, 0), x_dir=(0, 0, 1), z_dir=(0.999098, 0.0424639421, 0))):
        with BuildLine():
            ThreePointArc((0, 6.4200755351), (0.7439487758, 8.2161267593), (2.54, 8.9600755351))
            Line((2.54, 8.9600755351), (0, 8.9600755351))
            Line((0, 8.9600755351), (0, 6.4200755351))
        make_face()
    extrude(amount=F3_T93_DEPTH)

    split(bisect_by=Plane(origin=(11.7873847203, 2.4170477024, 0), x_dir=(0, 0, 1), z_dir=(-0.9796170513, -0.2008741718, 0)), keep=Keep.TOP)


with BuildPart() as f3_tool87_1:
    add(f3_tool87.part)

    # F3_t95: intersect F3_tool91
    add(f3_tool91.part, mode=Mode.INTERSECT)


with BuildPart() as f1_15:
    add(f1_14.part)

    # F3_t85: cut F3_tool87
    add(f3_tool87_1.part, mode=Mode.SUBTRACT)


with BuildPart() as f3_tool98:
    # F3_s99 → F3_t100 (new body)
    with BuildSketch(Plane(origin=(59.9845103223, -19.9680486945, 0), x_dir=(0, 0, 1), z_dir=(-0.9488103383, 0.3158463899, 0))):
        with BuildLine():
            ThreePointArc((0, 9.5273839538), (0.7439487758, 11.323435178), (2.54, 12.0673839538))
            Line((2.54, 12.0673839538), (0, 12.0673839538))
            Line((0, 12.0673839538), (0, 9.5273839538))
        make_face()
    extrude(amount=F3_T100_DEPTH)

    split(bisect_by=Plane(origin=(8.0293246905, -4.1916114663, 0), x_dir=(0, 0, 1), z_dir=(-0.8864762199, 0.4627741474, 0)), keep=Keep.TOP)


with BuildPart() as f3_tool102:
    # F3_s103 → F3_t104 (new body)
    with BuildSketch(Plane(origin=(3.3933684506, 6.5002344095, 0), x_dir=(0, 0, 1), z_dir=(0.4627741474, 0.8864762199, 0))):
        with BuildLine():
            ThreePointArc((0, 6.5175748228), (0.7439487758, 8.313626047), (2.54, 9.0575748228))
            Line((2.54, 9.0575748228), (0, 9.0575748228))
            Line((0, 9.0575748228), (0, 6.5175748228))
        make_face()
    extrude(amount=F3_T104_DEPTH)

    split(bisect_by=Plane(origin=(3.8114396575, 11.449658651, 0), x_dir=(0, 0, 1), z_dir=(-0.3158463899, -0.9488103383, 0)), keep=Keep.TOP)


with BuildPart() as f3_tool98_1:
    add(f3_tool98.part)

    # F3_t106: intersect F3_tool102
    add(f3_tool102.part, mode=Mode.INTERSECT)


with BuildPart() as f1_16:
    add(f1_15.part)

    # F3_t96: cut F3_tool98
    add(f3_tool98_1.part, mode=Mode.SUBTRACT)


with BuildPart() as f3_tool109:
    # F3_s110 → F3_t111 (new body)
    with BuildSketch(Plane(origin=(47.3466192661, 42.0186884801, 0), x_dir=(0, 0, 1), z_dir=(-0.7479361665, -0.6637706613, 0))):
        with BuildLine():
            ThreePointArc((0, 9.4543789874), (0.7439487758, 11.2504302116), (2.54, 11.9943789874))
            Line((2.54, 11.9943789874), (0, 11.9943789874))
            Line((0, 11.9943789874), (0, 9.4543789874))
        make_face()
    extrude(amount=F3_T111_DEPTH)

    split(bisect_by=Plane(origin=(7.7230530734, 4.9075797674, 0), x_dir=(0, 0, 1), z_dir=(-0.8440122778, -0.5363238526, 0)), keep=Keep.TOP)


with BuildPart() as f3_tool113:
    # F3_s114 → F3_t115 (new body)
    with BuildSketch(Plane(origin=(-3.9010473932, 6.1390741441, 0), x_dir=(0, 0, 1), z_dir=(-0.5363238526, 0.8440122778, 0))):
        with BuildLine():
            ThreePointArc((0, 6.6104037041), (0.7439487758, 8.4064549283), (2.54, 9.1504037041))
            Line((2.54, 9.1504037041), (0, 9.1504037041))
            Line((0, 9.1504037041), (0, 6.6104037041))
        make_face()
    extrude(amount=F3_T115_DEPTH)

    split(bisect_by=Plane(origin=(-7.9615168729, 8.9710298392, 0), x_dir=(0, 0, 1), z_dir=(0.6637706613, -0.7479361665, 0)), keep=Keep.TOP)


with BuildPart() as f3_tool109_1:
    add(f3_tool109.part)

    # F3_t117: intersect F3_tool113
    add(f3_tool113.part, mode=Mode.INTERSECT)


with BuildPart() as f1_17:
    add(f1_16.part)

    # F3_t107: cut F3_tool109
    add(f3_tool109_1.part, mode=Mode.SUBTRACT)


with BuildPart() as f3_tool120:
    # F3_s121 → F3_t122 (new body)
    with BuildSketch(Plane(origin=(-7.1573309587, -0.3042028783, 0), x_dir=(0, 0, 1), z_dir=(-0.999098, -0.0424639421, 0))):
        with BuildLine():
            ThreePointArc((2.54, 9.1457332978), (0.7439487758, 8.4017845221), (0, 6.6057332978))
            Line((0, 6.6057332978), (0, 9.1457332978))
            Line((0, 9.1457332978), (2.54, 9.1457332978))
        make_face()
    extrude(amount=F3_T122_DEPTH)

    split(bisect_by=Plane(origin=(-11.6443509005, -2.3877180781, 0), x_dir=(0, 0, 1), z_dir=(0.9796170513, 0.2008741718, 0)), keep=Keep.TOP)


with BuildPart() as f3_tool124:
    # F3_s125 → F3_t126 (new body)
    with BuildSketch(Plane(origin=(-12.7115040729, 61.9910764409, 0), x_dir=(0, 0, 1), z_dir=(0.2008741718, -0.9796170513, 0))):
        with BuildLine():
            ThreePointArc((0, 9.3466355844), (0.7439487758, 11.1426868086), (2.54, 11.8866355844))
            Line((2.54, 11.8866355844), (0, 11.8866355844))
            Line((0, 11.8866355844), (0, 9.3466355844))
        make_face()
    extrude(amount=F3_T126_DEPTH)

    split(bisect_by=Plane(origin=(-0.3883638891, 9.1374838465, 0), x_dir=(0, 0, 1), z_dir=(0.0424639421, -0.999098, 0)), keep=Keep.TOP)


with BuildPart() as f3_tool120_1:
    add(f3_tool120.part)

    # F3_t128: intersect F3_tool124
    add(f3_tool124.part, mode=Mode.INTERSECT)


with BuildPart() as f1_18:
    add(f1_17.part)

    # F3_t118: cut F3_tool120
    add(f3_tool120_1.part, mode=Mode.SUBTRACT)


solid = f1_18.part
